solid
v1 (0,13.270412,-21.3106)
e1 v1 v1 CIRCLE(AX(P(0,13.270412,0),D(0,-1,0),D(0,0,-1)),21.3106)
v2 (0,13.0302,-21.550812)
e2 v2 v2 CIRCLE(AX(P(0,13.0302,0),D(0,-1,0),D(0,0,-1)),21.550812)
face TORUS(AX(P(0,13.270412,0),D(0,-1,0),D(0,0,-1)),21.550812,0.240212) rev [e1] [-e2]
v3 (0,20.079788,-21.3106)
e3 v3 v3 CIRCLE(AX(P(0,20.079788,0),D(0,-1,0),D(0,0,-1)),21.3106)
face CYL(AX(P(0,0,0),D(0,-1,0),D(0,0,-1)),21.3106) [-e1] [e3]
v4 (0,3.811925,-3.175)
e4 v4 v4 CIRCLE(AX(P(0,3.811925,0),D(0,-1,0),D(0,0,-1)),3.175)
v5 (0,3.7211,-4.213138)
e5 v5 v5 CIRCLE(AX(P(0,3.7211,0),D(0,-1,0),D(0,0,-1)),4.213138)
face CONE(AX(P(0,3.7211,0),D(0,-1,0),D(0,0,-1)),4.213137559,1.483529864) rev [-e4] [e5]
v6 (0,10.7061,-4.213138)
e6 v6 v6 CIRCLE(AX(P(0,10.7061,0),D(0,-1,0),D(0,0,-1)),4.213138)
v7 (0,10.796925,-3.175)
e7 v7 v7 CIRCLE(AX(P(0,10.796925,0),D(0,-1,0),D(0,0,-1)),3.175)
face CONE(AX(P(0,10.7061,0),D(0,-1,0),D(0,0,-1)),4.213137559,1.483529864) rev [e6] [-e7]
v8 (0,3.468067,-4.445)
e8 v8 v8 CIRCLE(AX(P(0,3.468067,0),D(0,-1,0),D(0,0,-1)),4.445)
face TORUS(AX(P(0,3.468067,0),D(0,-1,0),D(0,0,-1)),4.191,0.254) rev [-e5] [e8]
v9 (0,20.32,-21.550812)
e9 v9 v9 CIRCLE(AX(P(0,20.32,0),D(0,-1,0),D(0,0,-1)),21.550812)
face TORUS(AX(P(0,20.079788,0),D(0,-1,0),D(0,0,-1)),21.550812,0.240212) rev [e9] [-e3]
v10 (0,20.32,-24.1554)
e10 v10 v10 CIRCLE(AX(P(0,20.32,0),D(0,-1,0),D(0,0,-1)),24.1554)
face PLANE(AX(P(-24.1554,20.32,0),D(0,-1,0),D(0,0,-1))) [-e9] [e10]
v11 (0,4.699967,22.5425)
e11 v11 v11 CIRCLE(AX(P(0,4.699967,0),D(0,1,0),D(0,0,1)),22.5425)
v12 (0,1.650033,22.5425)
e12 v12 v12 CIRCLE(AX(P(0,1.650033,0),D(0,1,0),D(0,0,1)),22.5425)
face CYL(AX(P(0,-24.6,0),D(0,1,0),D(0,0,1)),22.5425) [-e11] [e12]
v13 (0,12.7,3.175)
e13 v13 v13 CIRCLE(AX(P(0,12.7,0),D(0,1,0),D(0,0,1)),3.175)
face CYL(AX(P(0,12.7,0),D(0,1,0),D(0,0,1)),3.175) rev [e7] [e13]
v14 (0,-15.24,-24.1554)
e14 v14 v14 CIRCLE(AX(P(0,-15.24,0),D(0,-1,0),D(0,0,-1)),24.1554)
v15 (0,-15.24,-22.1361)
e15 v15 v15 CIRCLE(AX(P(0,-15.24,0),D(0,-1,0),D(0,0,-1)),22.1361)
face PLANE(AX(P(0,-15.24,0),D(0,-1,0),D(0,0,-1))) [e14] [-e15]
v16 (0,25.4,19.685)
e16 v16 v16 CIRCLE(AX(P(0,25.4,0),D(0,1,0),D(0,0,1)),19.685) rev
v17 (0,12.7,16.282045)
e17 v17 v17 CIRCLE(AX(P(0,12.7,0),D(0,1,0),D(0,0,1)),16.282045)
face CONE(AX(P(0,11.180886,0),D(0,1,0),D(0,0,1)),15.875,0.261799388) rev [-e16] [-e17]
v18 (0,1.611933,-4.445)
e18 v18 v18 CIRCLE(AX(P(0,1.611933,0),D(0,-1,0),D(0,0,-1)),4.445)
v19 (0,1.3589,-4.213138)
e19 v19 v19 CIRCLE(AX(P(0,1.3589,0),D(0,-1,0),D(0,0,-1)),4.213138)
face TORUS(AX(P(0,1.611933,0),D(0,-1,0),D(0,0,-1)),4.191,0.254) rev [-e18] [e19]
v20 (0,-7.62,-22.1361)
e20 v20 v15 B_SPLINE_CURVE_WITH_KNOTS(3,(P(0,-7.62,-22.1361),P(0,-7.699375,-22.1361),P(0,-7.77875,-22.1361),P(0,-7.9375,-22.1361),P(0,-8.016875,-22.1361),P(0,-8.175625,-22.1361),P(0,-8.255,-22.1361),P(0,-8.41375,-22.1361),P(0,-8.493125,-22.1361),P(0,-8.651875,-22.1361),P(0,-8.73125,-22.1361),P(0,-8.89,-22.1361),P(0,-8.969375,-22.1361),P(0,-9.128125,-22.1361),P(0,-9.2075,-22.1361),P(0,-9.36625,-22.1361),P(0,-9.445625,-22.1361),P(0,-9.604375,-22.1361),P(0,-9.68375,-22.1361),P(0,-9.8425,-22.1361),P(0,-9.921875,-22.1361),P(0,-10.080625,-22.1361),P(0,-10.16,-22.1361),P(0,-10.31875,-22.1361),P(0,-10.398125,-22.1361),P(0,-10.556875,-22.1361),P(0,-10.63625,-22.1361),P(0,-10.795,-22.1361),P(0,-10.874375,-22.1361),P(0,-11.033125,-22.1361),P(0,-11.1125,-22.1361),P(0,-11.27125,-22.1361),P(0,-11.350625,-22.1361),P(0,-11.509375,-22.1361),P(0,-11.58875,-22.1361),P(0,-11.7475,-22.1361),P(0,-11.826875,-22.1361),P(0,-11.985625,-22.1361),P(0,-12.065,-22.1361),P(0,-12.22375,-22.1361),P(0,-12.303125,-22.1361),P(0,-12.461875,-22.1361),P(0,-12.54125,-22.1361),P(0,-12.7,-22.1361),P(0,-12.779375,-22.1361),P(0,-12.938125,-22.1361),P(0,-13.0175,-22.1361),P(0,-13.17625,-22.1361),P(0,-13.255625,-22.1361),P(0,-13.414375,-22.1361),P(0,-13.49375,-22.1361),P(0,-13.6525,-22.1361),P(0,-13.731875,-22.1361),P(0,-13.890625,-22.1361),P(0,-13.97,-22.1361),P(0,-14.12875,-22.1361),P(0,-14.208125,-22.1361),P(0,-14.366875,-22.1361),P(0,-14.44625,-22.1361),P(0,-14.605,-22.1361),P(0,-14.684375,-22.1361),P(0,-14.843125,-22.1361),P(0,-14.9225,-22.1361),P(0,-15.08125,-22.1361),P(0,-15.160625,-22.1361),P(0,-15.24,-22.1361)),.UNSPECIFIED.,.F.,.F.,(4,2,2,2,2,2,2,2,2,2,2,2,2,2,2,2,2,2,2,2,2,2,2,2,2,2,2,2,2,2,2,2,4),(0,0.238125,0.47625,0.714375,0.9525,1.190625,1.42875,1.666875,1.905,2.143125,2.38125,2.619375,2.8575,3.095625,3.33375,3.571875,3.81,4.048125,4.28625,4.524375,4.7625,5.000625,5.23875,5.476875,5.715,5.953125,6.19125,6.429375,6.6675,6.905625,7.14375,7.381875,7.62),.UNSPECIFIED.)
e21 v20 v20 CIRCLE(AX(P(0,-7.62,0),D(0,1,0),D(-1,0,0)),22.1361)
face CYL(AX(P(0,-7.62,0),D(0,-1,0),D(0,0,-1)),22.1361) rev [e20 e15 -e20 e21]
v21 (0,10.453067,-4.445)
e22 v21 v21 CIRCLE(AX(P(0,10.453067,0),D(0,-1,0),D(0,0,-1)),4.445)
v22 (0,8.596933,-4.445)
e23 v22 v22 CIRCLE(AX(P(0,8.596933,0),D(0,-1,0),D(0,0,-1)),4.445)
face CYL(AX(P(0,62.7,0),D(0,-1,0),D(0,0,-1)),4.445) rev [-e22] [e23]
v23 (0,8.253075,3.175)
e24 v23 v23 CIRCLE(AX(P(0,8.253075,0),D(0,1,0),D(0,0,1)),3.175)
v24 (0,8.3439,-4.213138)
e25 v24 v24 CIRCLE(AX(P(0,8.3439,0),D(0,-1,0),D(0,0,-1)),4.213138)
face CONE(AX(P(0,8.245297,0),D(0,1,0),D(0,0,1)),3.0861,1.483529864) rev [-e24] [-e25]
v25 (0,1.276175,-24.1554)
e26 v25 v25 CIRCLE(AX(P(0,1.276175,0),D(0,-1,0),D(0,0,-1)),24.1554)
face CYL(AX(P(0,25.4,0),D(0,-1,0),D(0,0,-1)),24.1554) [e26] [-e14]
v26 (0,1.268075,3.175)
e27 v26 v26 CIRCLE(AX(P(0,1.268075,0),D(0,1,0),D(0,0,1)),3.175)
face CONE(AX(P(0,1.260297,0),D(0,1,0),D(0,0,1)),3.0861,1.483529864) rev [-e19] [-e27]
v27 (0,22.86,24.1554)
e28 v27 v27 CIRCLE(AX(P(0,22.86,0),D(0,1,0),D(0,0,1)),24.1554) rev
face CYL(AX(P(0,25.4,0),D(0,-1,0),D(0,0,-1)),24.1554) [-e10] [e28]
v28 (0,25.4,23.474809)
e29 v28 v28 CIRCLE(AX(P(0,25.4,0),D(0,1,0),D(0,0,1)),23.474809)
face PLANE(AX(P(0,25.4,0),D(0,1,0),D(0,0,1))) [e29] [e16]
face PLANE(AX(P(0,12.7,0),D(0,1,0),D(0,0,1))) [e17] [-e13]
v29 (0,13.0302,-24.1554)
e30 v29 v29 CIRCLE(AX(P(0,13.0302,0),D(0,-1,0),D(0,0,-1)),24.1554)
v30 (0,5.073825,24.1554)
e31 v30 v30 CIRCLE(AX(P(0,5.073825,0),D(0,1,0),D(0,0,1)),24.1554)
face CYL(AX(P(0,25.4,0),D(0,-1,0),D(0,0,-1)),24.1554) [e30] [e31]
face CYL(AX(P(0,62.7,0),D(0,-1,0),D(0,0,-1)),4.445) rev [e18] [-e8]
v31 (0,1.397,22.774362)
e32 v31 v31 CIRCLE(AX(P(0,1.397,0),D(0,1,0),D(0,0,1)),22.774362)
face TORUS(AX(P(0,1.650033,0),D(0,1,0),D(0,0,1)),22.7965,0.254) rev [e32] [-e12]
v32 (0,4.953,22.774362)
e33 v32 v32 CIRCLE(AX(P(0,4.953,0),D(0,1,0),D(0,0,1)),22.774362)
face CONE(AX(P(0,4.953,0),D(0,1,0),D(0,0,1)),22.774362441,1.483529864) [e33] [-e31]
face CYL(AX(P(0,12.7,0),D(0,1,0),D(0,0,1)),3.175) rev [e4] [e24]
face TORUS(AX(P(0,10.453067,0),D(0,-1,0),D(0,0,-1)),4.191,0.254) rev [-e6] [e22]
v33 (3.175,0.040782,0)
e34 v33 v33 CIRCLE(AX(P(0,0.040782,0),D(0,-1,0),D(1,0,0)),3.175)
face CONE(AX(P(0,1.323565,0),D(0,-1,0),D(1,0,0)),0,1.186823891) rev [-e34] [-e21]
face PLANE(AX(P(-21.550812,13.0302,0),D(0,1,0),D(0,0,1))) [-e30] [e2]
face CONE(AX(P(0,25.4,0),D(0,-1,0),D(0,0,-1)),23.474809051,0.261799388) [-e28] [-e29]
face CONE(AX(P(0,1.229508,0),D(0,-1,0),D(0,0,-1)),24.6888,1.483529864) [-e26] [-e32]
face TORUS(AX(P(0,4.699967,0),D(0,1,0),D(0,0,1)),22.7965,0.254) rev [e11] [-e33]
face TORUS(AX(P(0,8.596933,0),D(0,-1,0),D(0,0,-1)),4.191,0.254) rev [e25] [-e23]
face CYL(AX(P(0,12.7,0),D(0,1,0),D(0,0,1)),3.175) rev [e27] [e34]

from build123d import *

# Parameters (mm, degrees)
SKETCH1_R                       = 24.1554
BODY_DEPTH                      = 25.4
SKETCH2_R                       = 15.875
LIGHTENING_HOLE_DEPTH           = 12.7
INSTALL_CHAMFER_SIZE            = 2.54
INSTALL_CHAMFER_SIZE2           = 0.680590949
PROP_CHAMFER_SIZE               = 3.81
PROP_CHAMFER_SIZE_2             = 14.219113577
BOTTOM_REDUCE_START             = -12.7
SKETCH6_R                       = 24.1554
BOTTOM_REDUCE_DEPTH             = 12.7
F_1_4_0_25_DIAMETER_HOLE3_D     = 6.35
F_1_4_0_25_DIAMETER_HOLE3_DEPTH = 12.7
F_1_4_0_25_DIAMETER_HOLE3_TIP   = 1.907732465
CIRPATTERN5_COUNT               = 8
SKETCH145_R                     = 24.1554
BOSS_EXTRUDE2_DEPTH             = 2.54
SKETCH143_R                     = 22.1361
CUT_EXTRUDE4_DEPTH              = 7.62


# Read off the part's stored shape, not the designer's step: Groove for AS 568-010, O-Ring2
with BuildPart() as part:
    # Sketch1 → body (new, symmetric)
    with BuildSketch(Plane(origin=(0, 0, 0), x_dir=(1, 0, 0), z_dir=(0, 1, 0))):
        with Locations(Location((0, 0, 0), (0, 0, 270))):
            Circle(SKETCH1_R)
    extrude(amount=BODY_DEPTH, both=True)

    # Sketch2 → lightening hole (cut)
    with BuildSketch(Plane(origin=(0, 25.4, 0), x_dir=(1, 0, 0), z_dir=(0, 1, 0))):
        with Locations(Location((0, 0, 0), (0, 0, 270))):
            Circle(SKETCH2_R)
    lightening_hole = extrude(amount=-LIGHTENING_HOLE_DEPTH, mode=Mode.SUBTRACT)

    # main-o-ring → o-ring-main (with backup rings) (revolve, cut)
    with BuildSketch(Plane.XY, mode=Mode.PRIVATE) as o_ring_main_with_backup_rings_sk:
        with BuildLine():
            Line((-24.1554, 20.32), (-24.1554, 13.0302))
            Line((-24.1554, 13.0302), (-21.550812385, 13.0302))
            ThreePointArc((-21.550812385, 13.0302), (-21.380956579, 13.100556579), (-21.3106, 13.270412385))
            Line((-21.3106, 13.270412385), (-21.3106, 20.079787615))
            ThreePointArc((-21.3106, 20.079787615), (-21.380956579, 20.249643421), (-21.550812385, 20.32))
            Line((-21.550812385, 20.32), (-24.1554, 20.32))
        make_face()
    o_ring_main_with_backup_rings = revolve(o_ring_main_with_backup_rings_sk.sketch.rotate(Axis((0, 0, 0), (0, 1, 0)), 270), axis=Axis((0, 0, 0), (0, 1, 0)), mode=Mode.SUBTRACT)

    # install-chamfer
    install_chamfer_edges = [part.edges().sort_by_distance(p)[0] for p in [
        (0, 25.4, -24.1554),
    ]]
    install_chamfer_side = [part.faces().sort_by_distance(p)[0] for p in [
        (0, 22.86, -24.1554),
    ]]
    chamfer(install_chamfer_edges, length=INSTALL_CHAMFER_SIZE, length2=INSTALL_CHAMFER_SIZE2, reference=install_chamfer_side[0])

    # prop-chamfer
    # the kernel refuses this chamfer: 14.219113577, 3.81 mm, written as the material it takes off along each edge
    with BuildSketch(Plane(origin=(0, 25.4, 0), x_dir=(0, 0, 1), z_dir=(-1, 0, 0))) as prop_chamfer_piece_1_section:
        Polygon((15.875 + PROP_CHAMFER_SIZE, 0), (15.875, -PROP_CHAMFER_SIZE_2), (15.875, 0), align=None)
    prop_chamfer_piece_1 = revolve(axis=Axis((0, 25.4, 0), (0, 1, 0)), mode=Mode.PRIVATE)
    prop_chamfer_piece_1 = split(prop_chamfer_piece_1, bisect_by=Plane(origin=(0, 12.7, -17.911519762), z_dir=(0, 1, 0)), keep=Keep.TOP, mode=Mode.PRIVATE)
    add(prop_chamfer_piece_1, mode=Mode.SUBTRACT)

    # Top-Bottom Symmetry: lightening hole, o-ring-main (with backup rings) across plane
    add(lightening_hole.mirror(Plane.ZX), mode=Mode.SUBTRACT)
    add(o_ring_main_with_backup_rings.mirror(Plane.ZX), mode=Mode.SUBTRACT)

    # Sketch6 → bottom-reduce (cut)
    with BuildSketch(Plane.XZ.offset(25.4).offset(BOTTOM_REDUCE_START)):
        with Locations(Location((0, 0, 0), (0, 0, 270))):
            Circle(SKETCH6_R)
    extrude(amount=BOTTOM_REDUCE_DEPTH, mode=Mode.SUBTRACT)

    # 1/4 (0.25) Diameter Hole3
    with Locations(Plane(origin=(0, 12.7, 0), x_dir=(1, 0, 0), z_dir=(0, 1, 0))):
        with Locations((0, 0)):
            Hole(F_1_4_0_25_DIAMETER_HOLE3_D / 2, depth=F_1_4_0_25_DIAMETER_HOLE3_DEPTH)
            with Locations((0, 0, -(F_1_4_0_25_DIAMETER_HOLE3_DEPTH + F_1_4_0_25_DIAMETER_HOLE3_TIP / 2))):  # 118° drill point
                Cone(0, F_1_4_0_25_DIAMETER_HOLE3_D / 2, F_1_4_0_25_DIAMETER_HOLE3_TIP, mode=Mode.SUBTRACT)

    # Groove for AS 568-010, O-Ring2 outline → Groove for AS 568-010, O-Ring2 (revolve, cut)
    with BuildSketch(Plane.XY):
        with BuildLine():
            Line((4.213137559, 10.7061), (3.175, 10.796925268))
            Line((3.175, 10.796925268), (3.175, 8.253074732))
            Line((3.175, 8.253074732), (4.213137559, 8.3439))
            ThreePointArc((4.213137559, 8.3439), (4.378268444, 8.425333541), (4.445, 8.596933453))
            Line((4.445, 8.596933453), (4.445, 10.453066547))
            ThreePointArc((4.445, 10.453066547), (4.378268444, 10.624666459), (4.213137559, 10.7061))
        make_face()
        with BuildLine():
            Line((4.213137559, 3.7211), (3.175, 3.811925268))
            Line((3.175, 3.811925268), (3.175, 1.268074732))
            Line((3.175, 1.268074732), (4.213137559, 1.3589))
            ThreePointArc((4.213137559, 1.3589), (4.378268444, 1.440333541), (4.445, 1.611933453))
            Line((4.445, 1.611933453), (4.445, 3.468066547))
            ThreePointArc((4.445, 3.468066547), (4.378268444, 3.639666459), (4.213137559, 3.7211))
        make_face()
    revolve(axis=Axis((0, 0, 0), (0, 1, 0)), mode=Mode.SUBTRACT)

    # Sketch112 → Groove for AS 568-132, O-Ring1 (revolve, cut)
    with BuildSketch(Plane(origin=(0, 25.4, 0), x_dir=(0, 0, -1), z_dir=(-1, 0, 0))):
        with BuildLine():
            Line((22.774362441, 24.003), (24.6888, 24.170491583))
            Line((24.6888, 24.170491583), (24.6888, 20.279508417))
            Line((24.6888, 20.279508417), (22.774362441, 20.447))
            ThreePointArc((22.774362441, 20.447), (22.609231556, 20.528433541), (22.5425, 20.700033453))
            Line((22.5425, 20.700033453), (22.5425, 23.749966547))
            ThreePointArc((22.5425, 23.749966547), (22.609231556, 23.921566459), (22.774362441, 24.003))
        make_face()
    revolve(axis=Axis((0, -24.6, 0), (0, 1, 0)), mode=Mode.SUBTRACT)

    # CirPattern5: part ×8 about axis
    cirpattern5_axis = Axis((0, 0, 0), (0, 1, 0))


with BuildPart() as part_1:
    add(part.part)
    for i in range(1, CIRPATTERN5_COUNT):
        add(part.part.rotate(cirpattern5_axis, i * 360 / CIRPATTERN5_COUNT))

    # Sketch145 → Boss-Extrude2 (add)
    with BuildSketch(Plane.XZ.offset(12.7)):
        with Locations(Location((0, 0, 0), (0, 0, 270))):
            Circle(SKETCH145_R)
    extrude(amount=BOSS_EXTRUDE2_DEPTH)

    # Sketch143 → Cut-Extrude4 (cut)
    with BuildSketch(Plane.XZ.offset(15.24)):
        with Locations(Location((0, 0, 0), (0, 0, 270))):
            Circle(SKETCH143_R)
    extrude(amount=-CUT_EXTRUDE4_DEPTH, mode=Mode.SUBTRACT)

    # Sketch144 → Cut-Revolve6 (revolve, cut)
    with BuildSketch(Plane.XY, mode=Mode.PRIVATE) as cut_revolve6_sk:
        Polygon((0, 1.323564938), (-22.1361, -7.62), (0, -7.62), align=None)
    revolve(cut_revolve6_sk.sketch.rotate(Axis((0, 0, 0), (0, -1, 0)), 90), axis=Axis((0, 0, 0), (0, -1, 0)), mode=Mode.SUBTRACT)


solid = part_1.part
